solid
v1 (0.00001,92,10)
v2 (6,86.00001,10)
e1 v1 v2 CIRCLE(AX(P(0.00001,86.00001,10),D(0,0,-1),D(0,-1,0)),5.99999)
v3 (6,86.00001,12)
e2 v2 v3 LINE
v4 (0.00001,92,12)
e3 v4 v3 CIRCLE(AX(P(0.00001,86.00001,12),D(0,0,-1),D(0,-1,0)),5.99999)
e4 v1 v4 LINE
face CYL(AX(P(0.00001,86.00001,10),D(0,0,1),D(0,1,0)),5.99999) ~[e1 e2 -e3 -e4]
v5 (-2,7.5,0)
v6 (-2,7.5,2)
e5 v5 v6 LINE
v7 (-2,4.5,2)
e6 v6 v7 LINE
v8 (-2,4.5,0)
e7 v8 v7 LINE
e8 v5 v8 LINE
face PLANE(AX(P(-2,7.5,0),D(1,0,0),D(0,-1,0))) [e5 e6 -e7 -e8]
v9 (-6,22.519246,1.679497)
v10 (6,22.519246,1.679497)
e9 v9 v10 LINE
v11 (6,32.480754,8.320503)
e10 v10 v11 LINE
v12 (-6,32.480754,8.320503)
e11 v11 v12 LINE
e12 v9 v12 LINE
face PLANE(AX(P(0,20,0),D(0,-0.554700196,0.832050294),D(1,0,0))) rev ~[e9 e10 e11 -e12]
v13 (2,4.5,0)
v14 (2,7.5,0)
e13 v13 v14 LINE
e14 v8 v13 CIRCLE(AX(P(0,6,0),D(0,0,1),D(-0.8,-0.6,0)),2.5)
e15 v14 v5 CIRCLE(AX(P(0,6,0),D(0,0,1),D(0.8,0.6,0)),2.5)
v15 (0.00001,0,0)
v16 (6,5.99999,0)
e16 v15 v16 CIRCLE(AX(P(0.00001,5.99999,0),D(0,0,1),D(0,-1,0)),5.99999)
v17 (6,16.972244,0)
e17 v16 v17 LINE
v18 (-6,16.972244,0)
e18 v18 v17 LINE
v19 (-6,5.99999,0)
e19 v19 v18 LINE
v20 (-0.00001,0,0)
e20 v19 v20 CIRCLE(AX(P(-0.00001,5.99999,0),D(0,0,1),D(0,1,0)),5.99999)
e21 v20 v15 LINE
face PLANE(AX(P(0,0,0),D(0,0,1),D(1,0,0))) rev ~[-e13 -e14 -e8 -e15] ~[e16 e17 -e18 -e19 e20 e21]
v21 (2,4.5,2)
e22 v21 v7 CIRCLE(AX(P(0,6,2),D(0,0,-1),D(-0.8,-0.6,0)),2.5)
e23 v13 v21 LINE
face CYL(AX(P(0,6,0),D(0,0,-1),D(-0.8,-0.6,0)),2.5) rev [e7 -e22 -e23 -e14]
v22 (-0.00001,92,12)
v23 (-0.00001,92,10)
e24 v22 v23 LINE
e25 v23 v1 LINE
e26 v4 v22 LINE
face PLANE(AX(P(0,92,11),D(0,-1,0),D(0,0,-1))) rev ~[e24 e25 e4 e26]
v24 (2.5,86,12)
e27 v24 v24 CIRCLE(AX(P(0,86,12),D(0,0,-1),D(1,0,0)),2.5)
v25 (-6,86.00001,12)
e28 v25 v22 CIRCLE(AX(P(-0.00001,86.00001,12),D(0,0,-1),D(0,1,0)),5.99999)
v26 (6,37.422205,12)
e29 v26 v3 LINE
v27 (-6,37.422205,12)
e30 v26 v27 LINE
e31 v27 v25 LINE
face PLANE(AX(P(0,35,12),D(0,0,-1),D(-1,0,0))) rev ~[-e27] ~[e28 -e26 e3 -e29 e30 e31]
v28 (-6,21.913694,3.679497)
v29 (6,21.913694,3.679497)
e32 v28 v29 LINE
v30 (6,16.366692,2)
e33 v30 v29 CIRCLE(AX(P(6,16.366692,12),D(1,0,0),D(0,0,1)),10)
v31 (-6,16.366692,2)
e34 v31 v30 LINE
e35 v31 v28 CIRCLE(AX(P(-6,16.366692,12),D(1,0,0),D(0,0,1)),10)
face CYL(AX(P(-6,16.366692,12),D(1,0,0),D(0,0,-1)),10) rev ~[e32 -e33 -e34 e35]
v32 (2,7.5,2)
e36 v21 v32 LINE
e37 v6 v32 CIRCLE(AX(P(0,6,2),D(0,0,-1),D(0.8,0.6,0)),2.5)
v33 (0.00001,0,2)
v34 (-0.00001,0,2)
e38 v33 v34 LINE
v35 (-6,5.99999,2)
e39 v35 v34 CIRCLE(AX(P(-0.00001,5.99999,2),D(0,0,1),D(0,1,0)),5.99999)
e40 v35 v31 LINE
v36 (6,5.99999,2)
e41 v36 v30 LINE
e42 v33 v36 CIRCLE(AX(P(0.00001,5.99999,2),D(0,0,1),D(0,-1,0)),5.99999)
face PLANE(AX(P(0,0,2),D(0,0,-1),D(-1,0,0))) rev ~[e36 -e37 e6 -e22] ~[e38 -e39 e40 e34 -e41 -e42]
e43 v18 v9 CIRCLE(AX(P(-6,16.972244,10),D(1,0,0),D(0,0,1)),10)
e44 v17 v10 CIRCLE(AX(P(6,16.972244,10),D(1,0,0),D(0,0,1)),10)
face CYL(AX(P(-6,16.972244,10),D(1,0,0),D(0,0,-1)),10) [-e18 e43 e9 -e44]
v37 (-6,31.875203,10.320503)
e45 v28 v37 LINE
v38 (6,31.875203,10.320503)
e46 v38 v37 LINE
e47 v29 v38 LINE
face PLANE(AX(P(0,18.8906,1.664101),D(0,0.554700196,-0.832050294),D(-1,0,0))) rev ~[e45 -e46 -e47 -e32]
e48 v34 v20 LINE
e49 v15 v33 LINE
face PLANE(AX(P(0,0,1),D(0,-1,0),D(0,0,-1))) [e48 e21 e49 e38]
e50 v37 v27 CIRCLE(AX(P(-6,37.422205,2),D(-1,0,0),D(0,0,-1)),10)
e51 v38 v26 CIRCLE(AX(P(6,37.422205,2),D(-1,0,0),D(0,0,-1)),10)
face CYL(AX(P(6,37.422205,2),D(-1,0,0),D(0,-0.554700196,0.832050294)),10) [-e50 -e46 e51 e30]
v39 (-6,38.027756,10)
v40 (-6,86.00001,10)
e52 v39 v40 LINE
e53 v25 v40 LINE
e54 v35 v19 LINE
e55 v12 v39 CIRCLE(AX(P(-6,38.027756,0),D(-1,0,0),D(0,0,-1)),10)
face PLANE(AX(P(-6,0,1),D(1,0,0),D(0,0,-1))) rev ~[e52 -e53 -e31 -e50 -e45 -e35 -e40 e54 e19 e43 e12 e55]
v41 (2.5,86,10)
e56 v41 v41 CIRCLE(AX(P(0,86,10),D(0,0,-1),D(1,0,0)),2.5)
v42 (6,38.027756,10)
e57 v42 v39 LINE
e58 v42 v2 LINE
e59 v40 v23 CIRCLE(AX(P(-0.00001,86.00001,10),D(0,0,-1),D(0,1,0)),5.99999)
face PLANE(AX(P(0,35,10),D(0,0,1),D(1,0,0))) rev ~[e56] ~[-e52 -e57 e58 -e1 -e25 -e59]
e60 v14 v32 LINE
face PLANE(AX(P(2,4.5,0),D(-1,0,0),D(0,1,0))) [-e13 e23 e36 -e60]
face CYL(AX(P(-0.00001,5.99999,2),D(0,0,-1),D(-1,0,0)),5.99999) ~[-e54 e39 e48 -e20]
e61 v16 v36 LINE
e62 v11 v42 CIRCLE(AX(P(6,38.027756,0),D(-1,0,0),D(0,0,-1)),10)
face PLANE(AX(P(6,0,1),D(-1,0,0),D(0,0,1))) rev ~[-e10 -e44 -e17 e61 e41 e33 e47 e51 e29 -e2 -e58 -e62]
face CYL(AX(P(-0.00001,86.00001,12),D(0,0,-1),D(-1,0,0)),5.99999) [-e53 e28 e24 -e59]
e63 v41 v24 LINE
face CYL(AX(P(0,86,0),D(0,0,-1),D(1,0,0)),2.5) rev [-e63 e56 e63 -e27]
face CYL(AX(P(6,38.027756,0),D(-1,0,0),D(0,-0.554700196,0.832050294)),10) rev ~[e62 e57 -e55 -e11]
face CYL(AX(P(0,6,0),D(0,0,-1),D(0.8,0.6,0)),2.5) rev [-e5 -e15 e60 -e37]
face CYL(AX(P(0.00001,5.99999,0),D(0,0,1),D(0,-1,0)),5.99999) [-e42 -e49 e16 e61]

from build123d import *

# Parameters (mm, degrees)
F1_W     = 12
F1_H     = 2
F3_R     = 10
F5_DEPTH = 12.001
F6_R     = 2.5
F7_DEPTH = 12.001
F8_R     = 5.99999
F9_R     = 5.99999


# Not quite as in the source:
# - a fillet or chamfer is up to 0.001 mm smaller than in the source, because OpenCascade refuses the exact size


with BuildPart() as f2:
    # F2: sweep along a path in F0
    with BuildLine(Plane.YZ) as f2_path:
        Line((0, 0), (20, 0))
        Line((20, 0), (35, 10))
        Line((35, 10), (92, 10))
    # F1 (on Front) → F2 (sweep)
    with BuildSketch(Plane.XZ):
        with Locations((0, 1)):
            Rectangle(F1_W, F1_H)
    sweep(path=f2_path.line, transition=Transition.RIGHT)

    # F3
    f3_edges = [f2.edges().sort_by_distance(p)[0] for p in [
        (0, 19.394449, 2),
        (0, 34.394449, 12),
        (0, 35, 10),
        (0, 20, 0),
    ]]
    fillet(f3_edges, radius=F3_R)

    # F4 (on Top) → F5 (cut, through all)
    with BuildSketch(Plane.XY):
        with BuildLine():
            Line((2, 4.5), (2, 7.5))
            ThreePointArc((2, 7.5), (0, 8.5), (-2, 7.5))
            Line((-2, 7.5), (-2, 4.5))
            ThreePointArc((-2, 4.5), (0, 3.5), (2, 4.5))
        make_face()
    extrude(amount=F5_DEPTH, mode=Mode.SUBTRACT)

    # F6 (on Top) → F7 (cut, through all)
    with BuildSketch(Plane.XY):
        with Locations((0, 86)):
            Circle(F6_R)
    extrude(amount=F7_DEPTH, mode=Mode.SUBTRACT)

    # F8 (radius 6 in the source; OpenCascade refuses exactly that, so slightly less here)
    f8_edges = [f2.edges().sort_by_distance(p)[0] for p in [
        (-6, 0, 1),
        (6, 0, 1),
    ]]
    fillet(f8_edges, radius=F8_R)

    # F9 (radius 6 in the source; OpenCascade refuses exactly that, so slightly less here)
    f9_edges = [f2.edges().sort_by_distance(p)[0] for p in [
        (6, 92, 11),
        (-6, 92, 11),
    ]]
    fillet(f9_edges, radius=F9_R)


solid = f2.part
